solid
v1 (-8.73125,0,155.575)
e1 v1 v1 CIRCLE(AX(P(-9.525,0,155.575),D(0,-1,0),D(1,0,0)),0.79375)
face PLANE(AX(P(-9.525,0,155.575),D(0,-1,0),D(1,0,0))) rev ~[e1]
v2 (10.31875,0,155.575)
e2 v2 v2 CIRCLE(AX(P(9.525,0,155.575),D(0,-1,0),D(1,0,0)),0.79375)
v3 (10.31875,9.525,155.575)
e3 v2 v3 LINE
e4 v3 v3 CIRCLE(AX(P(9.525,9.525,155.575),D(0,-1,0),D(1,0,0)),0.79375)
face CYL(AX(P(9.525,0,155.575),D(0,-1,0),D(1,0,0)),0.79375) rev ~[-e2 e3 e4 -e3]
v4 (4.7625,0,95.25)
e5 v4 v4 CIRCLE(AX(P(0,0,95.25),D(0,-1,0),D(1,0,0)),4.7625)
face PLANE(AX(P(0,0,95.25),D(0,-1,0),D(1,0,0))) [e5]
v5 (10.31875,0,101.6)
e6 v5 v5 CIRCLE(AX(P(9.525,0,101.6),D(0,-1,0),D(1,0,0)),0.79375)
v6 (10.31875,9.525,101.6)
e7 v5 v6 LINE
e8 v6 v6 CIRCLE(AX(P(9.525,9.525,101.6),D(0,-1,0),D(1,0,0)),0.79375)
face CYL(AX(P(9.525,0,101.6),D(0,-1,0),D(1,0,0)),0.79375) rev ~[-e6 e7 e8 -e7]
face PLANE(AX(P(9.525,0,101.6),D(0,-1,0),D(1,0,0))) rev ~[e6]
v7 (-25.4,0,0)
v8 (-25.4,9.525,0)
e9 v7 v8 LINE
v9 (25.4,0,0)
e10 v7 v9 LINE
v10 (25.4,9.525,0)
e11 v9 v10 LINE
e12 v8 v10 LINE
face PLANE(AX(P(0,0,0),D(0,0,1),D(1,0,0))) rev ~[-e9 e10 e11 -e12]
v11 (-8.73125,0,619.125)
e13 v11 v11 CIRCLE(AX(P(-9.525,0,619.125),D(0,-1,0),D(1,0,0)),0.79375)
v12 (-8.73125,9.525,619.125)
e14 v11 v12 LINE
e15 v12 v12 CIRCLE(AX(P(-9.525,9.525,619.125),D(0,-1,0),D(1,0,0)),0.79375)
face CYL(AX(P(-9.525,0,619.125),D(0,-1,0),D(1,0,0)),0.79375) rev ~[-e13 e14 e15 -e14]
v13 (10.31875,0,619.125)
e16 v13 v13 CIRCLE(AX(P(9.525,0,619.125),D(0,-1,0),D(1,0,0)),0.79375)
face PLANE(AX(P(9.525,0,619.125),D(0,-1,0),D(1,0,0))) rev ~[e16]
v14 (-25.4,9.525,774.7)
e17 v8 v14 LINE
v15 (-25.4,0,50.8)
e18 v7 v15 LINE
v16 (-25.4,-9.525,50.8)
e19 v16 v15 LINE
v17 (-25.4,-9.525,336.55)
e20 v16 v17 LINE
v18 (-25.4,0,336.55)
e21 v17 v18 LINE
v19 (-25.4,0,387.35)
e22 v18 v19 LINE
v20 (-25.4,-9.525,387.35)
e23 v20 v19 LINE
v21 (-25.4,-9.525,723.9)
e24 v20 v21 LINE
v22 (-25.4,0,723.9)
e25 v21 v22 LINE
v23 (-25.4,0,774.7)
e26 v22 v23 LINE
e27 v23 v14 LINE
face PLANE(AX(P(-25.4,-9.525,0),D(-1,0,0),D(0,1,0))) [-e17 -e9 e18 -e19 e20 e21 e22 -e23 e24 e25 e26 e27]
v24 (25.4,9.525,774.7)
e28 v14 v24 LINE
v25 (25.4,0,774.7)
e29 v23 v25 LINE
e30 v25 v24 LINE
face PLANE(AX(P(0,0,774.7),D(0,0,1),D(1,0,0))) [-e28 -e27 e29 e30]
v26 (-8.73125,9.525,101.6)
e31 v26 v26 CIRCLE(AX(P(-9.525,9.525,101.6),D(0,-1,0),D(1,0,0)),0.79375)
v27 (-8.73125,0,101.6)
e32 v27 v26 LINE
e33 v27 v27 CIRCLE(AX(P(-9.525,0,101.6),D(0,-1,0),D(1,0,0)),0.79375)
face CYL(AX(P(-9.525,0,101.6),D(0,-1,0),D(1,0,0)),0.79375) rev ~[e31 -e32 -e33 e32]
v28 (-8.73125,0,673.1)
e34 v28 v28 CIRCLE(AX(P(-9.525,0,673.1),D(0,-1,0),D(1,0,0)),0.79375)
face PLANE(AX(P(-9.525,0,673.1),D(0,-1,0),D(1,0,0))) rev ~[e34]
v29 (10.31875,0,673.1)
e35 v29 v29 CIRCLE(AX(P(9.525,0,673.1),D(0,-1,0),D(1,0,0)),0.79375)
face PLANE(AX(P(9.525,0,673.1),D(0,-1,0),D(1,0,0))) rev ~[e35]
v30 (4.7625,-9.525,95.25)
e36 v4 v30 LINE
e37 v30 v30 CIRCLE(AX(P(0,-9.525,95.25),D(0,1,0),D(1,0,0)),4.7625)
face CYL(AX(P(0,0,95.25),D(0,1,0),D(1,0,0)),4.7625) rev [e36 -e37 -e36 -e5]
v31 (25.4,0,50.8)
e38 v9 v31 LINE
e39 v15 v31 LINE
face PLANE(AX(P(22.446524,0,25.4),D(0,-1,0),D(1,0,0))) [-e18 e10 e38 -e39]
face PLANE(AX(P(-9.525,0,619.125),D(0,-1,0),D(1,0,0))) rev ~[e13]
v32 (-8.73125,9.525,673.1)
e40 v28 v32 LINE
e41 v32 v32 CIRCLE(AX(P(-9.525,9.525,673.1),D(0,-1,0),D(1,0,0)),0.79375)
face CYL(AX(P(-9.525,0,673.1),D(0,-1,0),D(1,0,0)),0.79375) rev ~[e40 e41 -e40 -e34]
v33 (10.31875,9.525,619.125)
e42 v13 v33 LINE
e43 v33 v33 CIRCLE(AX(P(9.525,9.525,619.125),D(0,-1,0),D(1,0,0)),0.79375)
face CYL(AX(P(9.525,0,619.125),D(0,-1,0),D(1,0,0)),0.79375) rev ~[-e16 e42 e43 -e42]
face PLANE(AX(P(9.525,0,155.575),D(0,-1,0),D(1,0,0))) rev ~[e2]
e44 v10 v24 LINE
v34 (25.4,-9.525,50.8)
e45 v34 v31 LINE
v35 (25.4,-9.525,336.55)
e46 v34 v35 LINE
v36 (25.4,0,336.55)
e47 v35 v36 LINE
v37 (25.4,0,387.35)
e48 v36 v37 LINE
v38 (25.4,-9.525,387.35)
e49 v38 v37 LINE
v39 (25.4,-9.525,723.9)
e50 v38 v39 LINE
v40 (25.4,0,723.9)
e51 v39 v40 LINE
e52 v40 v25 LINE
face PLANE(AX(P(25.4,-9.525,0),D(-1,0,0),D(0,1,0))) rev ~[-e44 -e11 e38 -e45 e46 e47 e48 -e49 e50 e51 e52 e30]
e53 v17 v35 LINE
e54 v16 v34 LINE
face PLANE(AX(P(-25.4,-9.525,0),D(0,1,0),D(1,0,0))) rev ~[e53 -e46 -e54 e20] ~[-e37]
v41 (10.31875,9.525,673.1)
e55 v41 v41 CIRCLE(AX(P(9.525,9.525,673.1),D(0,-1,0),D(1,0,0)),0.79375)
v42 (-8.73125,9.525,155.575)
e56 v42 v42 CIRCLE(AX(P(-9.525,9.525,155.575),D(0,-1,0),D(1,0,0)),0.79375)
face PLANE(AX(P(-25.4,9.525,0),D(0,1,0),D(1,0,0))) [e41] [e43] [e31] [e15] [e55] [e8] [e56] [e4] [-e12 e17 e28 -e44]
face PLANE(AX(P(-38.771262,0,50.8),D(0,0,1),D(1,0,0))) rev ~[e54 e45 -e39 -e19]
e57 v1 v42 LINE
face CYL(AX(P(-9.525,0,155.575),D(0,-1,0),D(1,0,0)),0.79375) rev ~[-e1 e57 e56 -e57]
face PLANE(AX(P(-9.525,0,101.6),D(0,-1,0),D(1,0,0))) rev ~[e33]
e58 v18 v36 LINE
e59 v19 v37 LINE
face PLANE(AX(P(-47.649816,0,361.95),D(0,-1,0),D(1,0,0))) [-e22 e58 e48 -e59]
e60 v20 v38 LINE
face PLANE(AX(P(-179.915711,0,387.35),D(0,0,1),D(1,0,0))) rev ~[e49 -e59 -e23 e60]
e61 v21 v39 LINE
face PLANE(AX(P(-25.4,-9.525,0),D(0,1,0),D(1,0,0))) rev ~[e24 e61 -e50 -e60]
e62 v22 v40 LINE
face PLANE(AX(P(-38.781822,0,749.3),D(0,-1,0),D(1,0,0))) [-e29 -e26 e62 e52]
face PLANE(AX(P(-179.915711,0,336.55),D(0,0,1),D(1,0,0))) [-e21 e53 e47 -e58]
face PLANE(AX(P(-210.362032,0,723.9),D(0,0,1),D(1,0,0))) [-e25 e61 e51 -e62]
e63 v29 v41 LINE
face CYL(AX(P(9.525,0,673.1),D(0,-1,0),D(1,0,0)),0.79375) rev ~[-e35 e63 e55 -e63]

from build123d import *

# Parameters (mm, degrees)
F0_W     = 50.8
F0_H     = 19.05
F1_DEPTH = 774.7
F2_W     = 122.43557321
F2_H     = 50.8
F2_W_2   = 343.1604206562
F2_W_3   = 264.5317912102
F3_DEPTH = 25.4
F4_R     = 0.79375
F5_DEPTH = 25.4
F6_R     = 4.7625
F7_DEPTH = 25.4


# Not quite as in the source:
# - a feature names something its author has since deleted; it is built from what else it names


with BuildPart() as f1:
    # F0 (on Top) → F1 (new body)
    with BuildSketch(Plane.XY):
        Rectangle(F0_W, F0_H)
    extrude(amount=F1_DEPTH)

    # F2 (on Front) → F3 (cut)
    with BuildSketch(Plane.XZ):
        with Locations((22.4465244144, 25.4)):
            Rectangle(F2_W, F2_H)
        with Locations((-38.7818217278, 749.3)):
            Rectangle(F2_W_2, F2_H)
        with Locations((-47.6498156786, 361.95)):
            Rectangle(F2_W_3, F2_H)
    extrude(amount=F3_DEPTH, mode=Mode.SUBTRACT)

    # F4 (on Front) → F5 (cut)
    with BuildSketch(Plane.XZ):
        with Locations((9.525, 101.6)):
            Circle(F4_R)
        with Locations((9.525, 155.575)):
            Circle(F4_R)
        with Locations((9.525, 619.125)):
            Circle(F4_R)
        with Locations((9.525, 673.1)):
            Circle(F4_R)
        with Locations((-9.525, 619.125)):
            Circle(F4_R)
        with Locations((-9.525, 673.1)):
            Circle(F4_R)
        with Locations((-9.525, 101.6)):
            Circle(F4_R)
        with Locations((-9.525, 155.575)):
            Circle(F4_R)
    extrude(amount=-F5_DEPTH, mode=Mode.SUBTRACT)

    # F6 (on Front) → F7 (cut)
    with BuildSketch(Plane.XZ):
        with Locations((0, 95.25)):
            Circle(F6_R)
    extrude(amount=F7_DEPTH, mode=Mode.SUBTRACT)


solid = f1.part
